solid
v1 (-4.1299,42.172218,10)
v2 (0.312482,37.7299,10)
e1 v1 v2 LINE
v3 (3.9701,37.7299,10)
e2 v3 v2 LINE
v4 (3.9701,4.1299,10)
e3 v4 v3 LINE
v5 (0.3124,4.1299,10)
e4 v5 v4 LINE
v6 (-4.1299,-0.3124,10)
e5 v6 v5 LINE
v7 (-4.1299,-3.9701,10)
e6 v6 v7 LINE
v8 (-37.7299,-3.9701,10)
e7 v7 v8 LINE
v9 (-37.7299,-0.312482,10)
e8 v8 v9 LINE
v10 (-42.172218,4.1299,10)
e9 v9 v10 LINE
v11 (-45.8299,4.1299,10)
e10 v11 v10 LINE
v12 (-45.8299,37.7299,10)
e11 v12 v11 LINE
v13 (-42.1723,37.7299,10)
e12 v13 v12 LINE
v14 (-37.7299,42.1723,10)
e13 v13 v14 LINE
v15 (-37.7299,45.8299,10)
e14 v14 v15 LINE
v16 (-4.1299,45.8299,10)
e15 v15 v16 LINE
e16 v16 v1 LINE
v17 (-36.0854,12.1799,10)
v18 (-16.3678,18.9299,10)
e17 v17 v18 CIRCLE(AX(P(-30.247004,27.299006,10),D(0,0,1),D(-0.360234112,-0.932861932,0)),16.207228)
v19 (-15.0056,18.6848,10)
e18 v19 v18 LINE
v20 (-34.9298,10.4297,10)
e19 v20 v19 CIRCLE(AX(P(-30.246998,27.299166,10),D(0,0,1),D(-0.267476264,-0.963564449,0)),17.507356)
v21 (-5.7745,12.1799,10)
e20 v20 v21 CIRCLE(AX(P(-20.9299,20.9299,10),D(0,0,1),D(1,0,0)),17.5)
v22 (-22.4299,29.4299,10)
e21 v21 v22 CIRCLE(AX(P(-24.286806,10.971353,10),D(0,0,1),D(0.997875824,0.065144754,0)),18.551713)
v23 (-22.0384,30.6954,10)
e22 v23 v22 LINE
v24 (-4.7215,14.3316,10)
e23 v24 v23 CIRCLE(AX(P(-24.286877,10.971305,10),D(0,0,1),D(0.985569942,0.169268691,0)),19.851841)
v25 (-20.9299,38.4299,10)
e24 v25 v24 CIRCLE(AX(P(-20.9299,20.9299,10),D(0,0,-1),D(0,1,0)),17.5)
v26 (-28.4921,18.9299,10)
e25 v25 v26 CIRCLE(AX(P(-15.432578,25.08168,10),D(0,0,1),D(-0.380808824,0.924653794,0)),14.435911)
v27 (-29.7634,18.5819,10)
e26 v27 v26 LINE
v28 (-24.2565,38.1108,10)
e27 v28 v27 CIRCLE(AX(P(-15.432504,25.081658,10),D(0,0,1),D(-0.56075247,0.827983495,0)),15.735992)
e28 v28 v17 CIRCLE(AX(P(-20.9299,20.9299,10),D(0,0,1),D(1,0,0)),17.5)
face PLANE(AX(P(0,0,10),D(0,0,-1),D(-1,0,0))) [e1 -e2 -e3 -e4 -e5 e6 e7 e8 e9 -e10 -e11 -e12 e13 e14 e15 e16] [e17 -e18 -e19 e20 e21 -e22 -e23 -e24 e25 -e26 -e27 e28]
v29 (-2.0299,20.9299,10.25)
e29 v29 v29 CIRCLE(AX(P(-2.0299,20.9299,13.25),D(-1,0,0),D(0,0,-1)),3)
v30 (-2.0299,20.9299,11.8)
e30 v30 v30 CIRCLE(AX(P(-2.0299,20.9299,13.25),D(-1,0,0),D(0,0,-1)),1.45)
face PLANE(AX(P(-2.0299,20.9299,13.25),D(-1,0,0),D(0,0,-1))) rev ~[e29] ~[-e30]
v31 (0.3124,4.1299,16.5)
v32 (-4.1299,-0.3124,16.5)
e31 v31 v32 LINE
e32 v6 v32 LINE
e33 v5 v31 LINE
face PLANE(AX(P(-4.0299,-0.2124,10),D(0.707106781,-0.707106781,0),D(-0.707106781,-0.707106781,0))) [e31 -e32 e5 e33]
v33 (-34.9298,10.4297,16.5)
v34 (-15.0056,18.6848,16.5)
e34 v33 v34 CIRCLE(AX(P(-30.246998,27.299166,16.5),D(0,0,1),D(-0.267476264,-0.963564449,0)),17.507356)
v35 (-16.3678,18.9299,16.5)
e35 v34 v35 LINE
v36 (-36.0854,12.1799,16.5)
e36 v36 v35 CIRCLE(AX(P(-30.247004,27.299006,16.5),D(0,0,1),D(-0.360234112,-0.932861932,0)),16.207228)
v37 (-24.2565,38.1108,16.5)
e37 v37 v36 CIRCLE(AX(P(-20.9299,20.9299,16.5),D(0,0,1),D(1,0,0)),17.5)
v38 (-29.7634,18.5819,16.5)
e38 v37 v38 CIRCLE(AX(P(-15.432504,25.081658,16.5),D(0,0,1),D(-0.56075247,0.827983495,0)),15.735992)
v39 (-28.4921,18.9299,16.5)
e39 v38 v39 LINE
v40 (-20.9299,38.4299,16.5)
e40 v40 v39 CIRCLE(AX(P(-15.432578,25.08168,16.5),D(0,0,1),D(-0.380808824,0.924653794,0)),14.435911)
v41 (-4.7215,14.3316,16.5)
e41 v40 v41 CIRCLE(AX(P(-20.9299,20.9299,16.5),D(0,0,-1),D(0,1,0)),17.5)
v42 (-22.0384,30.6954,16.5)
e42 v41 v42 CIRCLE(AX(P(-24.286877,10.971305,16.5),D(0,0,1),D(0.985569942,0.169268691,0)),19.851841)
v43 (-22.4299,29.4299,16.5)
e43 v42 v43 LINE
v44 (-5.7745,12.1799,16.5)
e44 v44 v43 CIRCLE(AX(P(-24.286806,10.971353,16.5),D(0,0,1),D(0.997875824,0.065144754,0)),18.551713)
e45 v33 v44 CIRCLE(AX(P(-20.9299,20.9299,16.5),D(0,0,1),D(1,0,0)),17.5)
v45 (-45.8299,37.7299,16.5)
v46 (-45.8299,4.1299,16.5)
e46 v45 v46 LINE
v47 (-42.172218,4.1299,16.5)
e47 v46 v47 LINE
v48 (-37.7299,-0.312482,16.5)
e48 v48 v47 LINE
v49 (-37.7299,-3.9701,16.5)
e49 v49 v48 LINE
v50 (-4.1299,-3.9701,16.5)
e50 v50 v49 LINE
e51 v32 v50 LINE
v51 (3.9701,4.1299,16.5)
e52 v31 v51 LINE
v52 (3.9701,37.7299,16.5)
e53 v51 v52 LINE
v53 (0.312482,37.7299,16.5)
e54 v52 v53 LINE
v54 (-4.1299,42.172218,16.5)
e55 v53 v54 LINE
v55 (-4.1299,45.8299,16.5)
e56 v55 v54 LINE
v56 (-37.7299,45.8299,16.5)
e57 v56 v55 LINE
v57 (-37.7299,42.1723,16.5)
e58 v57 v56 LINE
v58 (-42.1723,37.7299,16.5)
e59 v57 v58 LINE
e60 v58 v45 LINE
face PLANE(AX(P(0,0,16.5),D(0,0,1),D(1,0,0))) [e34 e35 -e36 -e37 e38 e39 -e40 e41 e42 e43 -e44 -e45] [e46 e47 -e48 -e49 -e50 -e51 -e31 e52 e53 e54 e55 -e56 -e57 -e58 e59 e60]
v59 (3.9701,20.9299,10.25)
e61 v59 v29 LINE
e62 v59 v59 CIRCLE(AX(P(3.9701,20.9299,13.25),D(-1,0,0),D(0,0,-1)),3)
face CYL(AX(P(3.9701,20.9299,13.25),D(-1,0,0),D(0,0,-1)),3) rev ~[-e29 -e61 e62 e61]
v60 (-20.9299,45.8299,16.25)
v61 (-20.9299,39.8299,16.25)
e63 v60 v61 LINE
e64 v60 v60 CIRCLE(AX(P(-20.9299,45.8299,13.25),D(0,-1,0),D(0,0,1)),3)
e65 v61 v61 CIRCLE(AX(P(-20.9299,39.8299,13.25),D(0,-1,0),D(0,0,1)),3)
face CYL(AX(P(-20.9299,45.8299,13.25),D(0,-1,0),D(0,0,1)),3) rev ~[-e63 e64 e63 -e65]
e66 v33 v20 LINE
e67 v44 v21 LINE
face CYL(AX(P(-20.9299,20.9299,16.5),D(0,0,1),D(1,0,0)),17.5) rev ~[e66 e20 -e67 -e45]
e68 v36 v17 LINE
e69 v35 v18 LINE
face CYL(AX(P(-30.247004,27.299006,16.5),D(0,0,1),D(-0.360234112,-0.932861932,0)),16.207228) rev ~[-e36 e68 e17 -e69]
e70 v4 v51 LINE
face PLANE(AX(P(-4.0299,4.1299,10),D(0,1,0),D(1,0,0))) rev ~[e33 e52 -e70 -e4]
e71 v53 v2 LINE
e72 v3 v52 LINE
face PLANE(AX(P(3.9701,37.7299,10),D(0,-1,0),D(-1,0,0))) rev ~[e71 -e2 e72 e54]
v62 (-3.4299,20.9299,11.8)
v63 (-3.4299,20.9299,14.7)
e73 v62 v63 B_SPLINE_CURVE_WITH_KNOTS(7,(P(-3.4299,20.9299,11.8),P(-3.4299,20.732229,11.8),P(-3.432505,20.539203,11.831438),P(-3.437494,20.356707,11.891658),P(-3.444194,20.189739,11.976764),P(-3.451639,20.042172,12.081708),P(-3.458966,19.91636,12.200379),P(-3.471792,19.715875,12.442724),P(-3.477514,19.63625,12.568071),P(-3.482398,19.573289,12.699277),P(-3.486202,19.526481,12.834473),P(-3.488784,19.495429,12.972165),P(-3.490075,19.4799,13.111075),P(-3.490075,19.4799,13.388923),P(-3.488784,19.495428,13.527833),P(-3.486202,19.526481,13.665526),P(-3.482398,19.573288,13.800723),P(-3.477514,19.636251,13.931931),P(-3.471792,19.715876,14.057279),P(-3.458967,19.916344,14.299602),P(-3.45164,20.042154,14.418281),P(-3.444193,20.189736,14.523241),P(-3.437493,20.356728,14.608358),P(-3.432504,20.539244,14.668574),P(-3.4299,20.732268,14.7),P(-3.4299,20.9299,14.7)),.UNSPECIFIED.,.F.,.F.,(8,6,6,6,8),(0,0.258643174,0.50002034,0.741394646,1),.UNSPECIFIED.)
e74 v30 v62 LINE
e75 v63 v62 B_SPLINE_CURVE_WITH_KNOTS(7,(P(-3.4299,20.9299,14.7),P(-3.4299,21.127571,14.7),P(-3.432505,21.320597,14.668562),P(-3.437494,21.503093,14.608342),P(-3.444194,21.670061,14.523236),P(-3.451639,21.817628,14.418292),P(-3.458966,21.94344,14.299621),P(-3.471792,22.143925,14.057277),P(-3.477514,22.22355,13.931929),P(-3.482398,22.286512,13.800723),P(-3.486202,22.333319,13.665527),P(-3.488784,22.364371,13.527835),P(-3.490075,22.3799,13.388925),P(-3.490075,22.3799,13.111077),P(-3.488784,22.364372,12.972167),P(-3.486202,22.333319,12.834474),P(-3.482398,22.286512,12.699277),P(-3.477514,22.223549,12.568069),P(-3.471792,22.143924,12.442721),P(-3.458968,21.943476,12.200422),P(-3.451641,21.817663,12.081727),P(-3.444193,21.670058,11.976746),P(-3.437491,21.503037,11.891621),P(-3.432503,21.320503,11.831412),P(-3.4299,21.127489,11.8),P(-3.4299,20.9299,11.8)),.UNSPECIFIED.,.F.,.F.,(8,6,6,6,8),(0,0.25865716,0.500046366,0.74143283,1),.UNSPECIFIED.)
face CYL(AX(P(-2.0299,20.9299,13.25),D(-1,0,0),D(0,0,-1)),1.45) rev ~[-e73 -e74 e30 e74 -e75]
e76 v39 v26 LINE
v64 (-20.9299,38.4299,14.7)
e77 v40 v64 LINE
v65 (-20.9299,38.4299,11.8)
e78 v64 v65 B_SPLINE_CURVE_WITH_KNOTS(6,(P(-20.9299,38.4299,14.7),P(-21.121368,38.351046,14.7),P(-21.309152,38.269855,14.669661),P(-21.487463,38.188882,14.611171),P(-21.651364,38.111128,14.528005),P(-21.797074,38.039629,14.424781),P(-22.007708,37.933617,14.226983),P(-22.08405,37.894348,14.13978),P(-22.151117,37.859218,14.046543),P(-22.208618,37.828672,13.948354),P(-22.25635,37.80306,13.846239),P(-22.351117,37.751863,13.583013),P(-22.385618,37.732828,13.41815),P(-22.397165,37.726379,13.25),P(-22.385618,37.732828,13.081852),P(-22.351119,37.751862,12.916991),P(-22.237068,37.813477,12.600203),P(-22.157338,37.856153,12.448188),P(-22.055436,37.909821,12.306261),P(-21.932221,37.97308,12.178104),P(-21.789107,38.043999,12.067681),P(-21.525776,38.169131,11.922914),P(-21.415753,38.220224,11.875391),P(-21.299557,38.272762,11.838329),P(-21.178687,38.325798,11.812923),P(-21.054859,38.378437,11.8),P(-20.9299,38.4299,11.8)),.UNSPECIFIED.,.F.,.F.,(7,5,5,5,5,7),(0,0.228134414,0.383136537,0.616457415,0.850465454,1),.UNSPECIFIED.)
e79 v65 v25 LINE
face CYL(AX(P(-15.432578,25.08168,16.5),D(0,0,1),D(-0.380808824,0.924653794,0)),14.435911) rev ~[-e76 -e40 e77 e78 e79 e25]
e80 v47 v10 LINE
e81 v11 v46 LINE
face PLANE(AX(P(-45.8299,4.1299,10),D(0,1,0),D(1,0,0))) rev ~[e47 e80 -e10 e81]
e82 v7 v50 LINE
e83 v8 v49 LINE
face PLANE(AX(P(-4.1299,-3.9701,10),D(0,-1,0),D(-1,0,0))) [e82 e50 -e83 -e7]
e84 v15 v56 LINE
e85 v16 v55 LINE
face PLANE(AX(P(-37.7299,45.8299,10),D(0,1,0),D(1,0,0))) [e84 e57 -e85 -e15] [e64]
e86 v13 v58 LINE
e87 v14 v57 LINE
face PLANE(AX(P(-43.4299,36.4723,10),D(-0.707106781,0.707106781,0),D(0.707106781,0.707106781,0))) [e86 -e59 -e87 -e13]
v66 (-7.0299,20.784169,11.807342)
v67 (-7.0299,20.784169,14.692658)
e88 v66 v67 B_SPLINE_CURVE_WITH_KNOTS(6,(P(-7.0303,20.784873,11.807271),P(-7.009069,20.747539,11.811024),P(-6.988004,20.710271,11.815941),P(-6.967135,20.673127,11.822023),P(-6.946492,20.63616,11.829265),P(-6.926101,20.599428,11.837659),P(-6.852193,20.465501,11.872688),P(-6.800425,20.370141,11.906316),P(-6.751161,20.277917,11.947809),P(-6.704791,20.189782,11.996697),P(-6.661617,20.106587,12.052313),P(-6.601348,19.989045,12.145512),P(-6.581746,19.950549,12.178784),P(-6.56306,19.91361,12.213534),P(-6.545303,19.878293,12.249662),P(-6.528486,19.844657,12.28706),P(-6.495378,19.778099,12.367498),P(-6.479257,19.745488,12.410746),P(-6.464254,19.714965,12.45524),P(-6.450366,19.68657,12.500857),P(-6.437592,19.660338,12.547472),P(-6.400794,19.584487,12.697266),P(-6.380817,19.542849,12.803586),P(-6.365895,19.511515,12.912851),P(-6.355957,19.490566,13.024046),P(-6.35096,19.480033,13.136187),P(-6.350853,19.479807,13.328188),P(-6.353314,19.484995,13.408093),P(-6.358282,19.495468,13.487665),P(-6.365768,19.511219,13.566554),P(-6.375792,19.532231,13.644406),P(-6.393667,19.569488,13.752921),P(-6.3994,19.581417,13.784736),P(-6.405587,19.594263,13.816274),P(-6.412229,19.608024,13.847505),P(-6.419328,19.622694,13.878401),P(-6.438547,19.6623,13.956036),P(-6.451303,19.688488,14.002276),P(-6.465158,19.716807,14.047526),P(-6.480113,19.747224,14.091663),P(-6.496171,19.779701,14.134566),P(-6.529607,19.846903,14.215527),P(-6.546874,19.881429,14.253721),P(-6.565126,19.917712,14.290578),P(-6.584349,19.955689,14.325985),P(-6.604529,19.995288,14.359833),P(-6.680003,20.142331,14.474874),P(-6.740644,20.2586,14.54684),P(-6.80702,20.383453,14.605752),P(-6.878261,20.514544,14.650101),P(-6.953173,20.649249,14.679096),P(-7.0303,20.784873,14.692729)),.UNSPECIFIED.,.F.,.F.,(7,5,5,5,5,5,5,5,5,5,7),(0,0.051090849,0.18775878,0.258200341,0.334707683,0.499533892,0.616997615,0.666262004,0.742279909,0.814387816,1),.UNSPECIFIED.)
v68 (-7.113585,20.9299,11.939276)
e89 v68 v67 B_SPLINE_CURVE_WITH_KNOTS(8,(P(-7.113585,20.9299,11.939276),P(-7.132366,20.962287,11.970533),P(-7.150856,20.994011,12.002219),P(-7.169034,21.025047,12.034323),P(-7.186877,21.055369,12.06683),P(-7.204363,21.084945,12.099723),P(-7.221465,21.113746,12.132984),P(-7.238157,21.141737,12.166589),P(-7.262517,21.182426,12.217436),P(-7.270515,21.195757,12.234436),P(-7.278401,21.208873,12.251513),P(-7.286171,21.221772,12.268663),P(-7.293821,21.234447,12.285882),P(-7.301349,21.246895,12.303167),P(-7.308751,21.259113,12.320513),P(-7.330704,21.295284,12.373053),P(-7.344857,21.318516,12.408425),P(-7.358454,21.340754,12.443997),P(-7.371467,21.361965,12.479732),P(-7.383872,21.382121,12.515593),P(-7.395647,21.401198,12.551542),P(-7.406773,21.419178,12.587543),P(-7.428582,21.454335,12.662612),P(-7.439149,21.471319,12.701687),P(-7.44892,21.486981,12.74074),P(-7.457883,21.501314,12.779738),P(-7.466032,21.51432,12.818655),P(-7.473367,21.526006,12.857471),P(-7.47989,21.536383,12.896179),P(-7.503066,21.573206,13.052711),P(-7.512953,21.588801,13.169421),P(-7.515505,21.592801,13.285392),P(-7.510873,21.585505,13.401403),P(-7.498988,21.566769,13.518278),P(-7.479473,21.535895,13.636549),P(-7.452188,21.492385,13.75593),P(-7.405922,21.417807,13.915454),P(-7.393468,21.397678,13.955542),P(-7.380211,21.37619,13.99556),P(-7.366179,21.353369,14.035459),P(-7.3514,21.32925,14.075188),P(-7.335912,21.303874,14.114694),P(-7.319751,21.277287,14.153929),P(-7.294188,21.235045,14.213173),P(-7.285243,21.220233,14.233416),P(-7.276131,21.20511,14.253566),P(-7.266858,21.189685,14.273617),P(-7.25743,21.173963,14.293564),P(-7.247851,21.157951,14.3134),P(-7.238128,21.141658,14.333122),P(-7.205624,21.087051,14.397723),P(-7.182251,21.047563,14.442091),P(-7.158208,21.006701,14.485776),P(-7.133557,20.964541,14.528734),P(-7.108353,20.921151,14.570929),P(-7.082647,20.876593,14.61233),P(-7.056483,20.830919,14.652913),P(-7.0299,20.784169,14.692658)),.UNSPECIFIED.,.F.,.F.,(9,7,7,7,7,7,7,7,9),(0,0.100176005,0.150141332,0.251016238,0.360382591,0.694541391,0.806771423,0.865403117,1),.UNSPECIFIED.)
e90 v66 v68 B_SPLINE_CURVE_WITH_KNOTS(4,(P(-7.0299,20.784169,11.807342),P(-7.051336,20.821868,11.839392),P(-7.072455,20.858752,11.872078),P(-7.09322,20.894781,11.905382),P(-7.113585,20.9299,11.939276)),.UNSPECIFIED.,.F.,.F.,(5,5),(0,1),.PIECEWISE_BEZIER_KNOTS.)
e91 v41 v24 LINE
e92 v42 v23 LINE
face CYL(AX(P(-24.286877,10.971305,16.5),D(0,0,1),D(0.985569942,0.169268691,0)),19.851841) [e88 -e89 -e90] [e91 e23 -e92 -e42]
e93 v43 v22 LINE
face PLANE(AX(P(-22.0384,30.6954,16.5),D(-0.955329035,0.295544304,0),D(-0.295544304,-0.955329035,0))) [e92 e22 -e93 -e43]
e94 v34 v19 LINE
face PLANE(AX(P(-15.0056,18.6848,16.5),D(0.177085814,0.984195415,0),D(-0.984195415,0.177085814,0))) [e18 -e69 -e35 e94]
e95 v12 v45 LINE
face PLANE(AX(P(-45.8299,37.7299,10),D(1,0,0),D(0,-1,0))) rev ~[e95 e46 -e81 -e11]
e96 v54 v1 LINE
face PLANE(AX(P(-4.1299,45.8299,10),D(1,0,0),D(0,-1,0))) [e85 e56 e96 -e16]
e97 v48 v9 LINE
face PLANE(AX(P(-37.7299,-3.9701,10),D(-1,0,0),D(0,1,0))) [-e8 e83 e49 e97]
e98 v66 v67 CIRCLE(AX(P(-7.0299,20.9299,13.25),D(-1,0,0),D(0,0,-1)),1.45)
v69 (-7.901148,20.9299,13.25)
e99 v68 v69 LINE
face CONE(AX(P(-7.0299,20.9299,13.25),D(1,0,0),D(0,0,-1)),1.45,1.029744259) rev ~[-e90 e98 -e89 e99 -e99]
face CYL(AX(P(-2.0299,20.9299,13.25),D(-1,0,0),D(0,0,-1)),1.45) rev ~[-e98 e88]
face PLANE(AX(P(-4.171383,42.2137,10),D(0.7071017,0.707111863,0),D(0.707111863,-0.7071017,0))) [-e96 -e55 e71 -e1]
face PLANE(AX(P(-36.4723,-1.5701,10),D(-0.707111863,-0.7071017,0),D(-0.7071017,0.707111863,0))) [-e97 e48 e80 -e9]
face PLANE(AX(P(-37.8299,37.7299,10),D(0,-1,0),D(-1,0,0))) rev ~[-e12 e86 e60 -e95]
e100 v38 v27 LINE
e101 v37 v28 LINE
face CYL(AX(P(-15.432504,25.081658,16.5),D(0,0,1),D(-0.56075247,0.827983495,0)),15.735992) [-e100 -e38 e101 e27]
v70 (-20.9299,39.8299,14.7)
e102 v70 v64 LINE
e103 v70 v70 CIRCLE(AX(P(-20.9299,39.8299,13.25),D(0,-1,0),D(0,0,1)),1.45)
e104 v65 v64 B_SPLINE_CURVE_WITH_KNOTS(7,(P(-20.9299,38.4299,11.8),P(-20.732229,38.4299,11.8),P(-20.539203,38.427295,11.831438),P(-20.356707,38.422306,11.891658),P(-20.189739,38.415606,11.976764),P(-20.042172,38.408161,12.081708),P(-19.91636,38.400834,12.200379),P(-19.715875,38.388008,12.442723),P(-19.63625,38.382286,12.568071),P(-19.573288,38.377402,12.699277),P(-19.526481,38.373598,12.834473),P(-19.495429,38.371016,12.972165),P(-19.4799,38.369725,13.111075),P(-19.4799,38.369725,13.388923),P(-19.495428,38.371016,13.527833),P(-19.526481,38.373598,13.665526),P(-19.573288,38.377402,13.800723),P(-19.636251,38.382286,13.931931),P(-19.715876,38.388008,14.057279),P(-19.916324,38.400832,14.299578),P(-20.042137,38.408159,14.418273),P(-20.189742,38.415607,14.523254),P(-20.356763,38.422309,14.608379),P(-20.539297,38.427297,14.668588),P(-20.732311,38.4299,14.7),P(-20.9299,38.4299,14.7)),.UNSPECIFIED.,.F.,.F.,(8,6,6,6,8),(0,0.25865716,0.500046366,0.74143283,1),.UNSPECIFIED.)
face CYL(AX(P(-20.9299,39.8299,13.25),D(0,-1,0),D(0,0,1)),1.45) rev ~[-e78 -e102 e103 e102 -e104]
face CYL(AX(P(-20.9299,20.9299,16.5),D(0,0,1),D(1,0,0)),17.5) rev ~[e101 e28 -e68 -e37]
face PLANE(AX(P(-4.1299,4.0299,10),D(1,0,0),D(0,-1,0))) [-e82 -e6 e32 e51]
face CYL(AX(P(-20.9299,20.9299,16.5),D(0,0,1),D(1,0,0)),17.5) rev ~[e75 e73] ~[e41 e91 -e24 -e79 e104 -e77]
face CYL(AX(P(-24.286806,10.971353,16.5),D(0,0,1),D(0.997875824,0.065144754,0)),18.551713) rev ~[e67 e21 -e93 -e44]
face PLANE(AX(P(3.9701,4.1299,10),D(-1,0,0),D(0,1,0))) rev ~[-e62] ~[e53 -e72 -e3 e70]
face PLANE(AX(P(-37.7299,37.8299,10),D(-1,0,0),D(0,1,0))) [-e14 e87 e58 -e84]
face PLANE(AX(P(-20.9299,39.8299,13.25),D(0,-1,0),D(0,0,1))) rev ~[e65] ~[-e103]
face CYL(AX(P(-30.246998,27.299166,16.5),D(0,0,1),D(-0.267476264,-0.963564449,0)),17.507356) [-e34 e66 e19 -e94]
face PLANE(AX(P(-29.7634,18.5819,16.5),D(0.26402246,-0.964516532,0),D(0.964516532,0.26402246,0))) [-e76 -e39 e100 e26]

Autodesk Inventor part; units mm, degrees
ref_plane "YZ Plane" through (0, 0, 0) normal (1, 0, 0) x (0, 1, 0)
ref_plane "Work Plane1" through (0, 0, 10) normal (0, 0, 1) x (1, 0, 0)
sketch "Sketch1" plane through (0, 0, 10) normal (0, 0, 1) x (1, 0, 0)
  line L0 (-4.0299, -0.3538) -> (-2.2322, 1.4439) construction
  arc A0 (-1.4439, 2.2322) -> (-2.2322, 1.4439) centre (-0.9299, 0.9299) ccw construction
  line L1 (-1.4439, 2.2322) -> (0.3538, 4.0299) construction
  line L2 (-37.8299, 42.2137) -> (-37.8299, 45.8299) construction
  line L3 (-37.8299, 45.8299) -> (-4.0299, 45.8299) construction
  line L4 (-4.0299, 45.8299) -> (-4.0299, 42.2137) construction
  line L5 (-4.0299, 4.0299) -> (0.3538, 4.0299) projected
  line L6 (-20.9299, 58.9723) -> (17.1124, 20.9299) construction
  line L7 (17.1124, 20.9299) -> (-20.9299, -17.1124) construction
  line L8 (-20.9299, -17.1124) -> (-58.9723, 20.9299) construction
  line L9 (-58.9723, 20.9299) -> (-20.9299, 58.9723) construction
  line L10 (-20.9299, 58.9723) -> (-20.9299, -17.1124) construction
  line L11 (17.1124, 20.9299) -> (-58.9723, 20.9299) construction
  line L12 (-20.9299, 58.9723) -> (32.8701, 58.9723) construction
  line L13 (-43.4299, 43.4299) -> (1.5701, 43.4299) construction
  line L14 (1.5701, 43.4299) -> (1.5701, -1.5701) construction
  line L15 (1.5701, -1.5701) -> (-43.4299, -1.5701) construction
  line L16 (-43.4299, -1.5701) -> (-43.4299, 43.4299) construction
  line L17 (-43.4299, 43.4299) -> (1.5701, -1.5701) construction
  line L18 (1.5701, 43.4299) -> (-43.4299, -1.5701) construction
  line L19 (-43.4299, 5.3876) -> (-43.4299, 36.4723)
  line L20 (-43.4299, 36.4723) -> (-36.4723, 43.4299)
  line L21 (-36.4723, 43.4299) -> (-5.3876, 43.4299)
  line L22 (-5.3876, 43.4299) -> (1.5701, 36.4723)
  line L23 (1.5701, 36.4723) -> (1.5701, 5.3876)
  line L24 (1.5701, 5.3876) -> (-5.3876, -1.5701)
  line L25 (-5.3876, -1.5701) -> (-36.4723, -1.5701)
  line L26 (-36.4723, -1.5701) -> (-43.4299, 5.3876)
  line L27 (-4.0299, 42.2137) -> (-37.8299, 42.2137) projected
  line L28 (-4.0299, -0.3538) -> (-4.0299, 4.0299) projected
  circle A1 centre (-20.9299, 20.9299) radius 13.3985
  circle A2 centre (-20.9299, 20.9299) radius 15.4895
  point P0 (-37.8299, 4.0299)
  dimension "d18" = 53.8
  dimension "d19" = 45
  dimension "d20" = 53.8
  dimension "d21" = 45
  dimension "d22" = 45
  dimension "d30" = 26.797
  dimension "d36" = 30.979
extrude "Extrusion1" add sketch "Sketch1" along normal blind 6.5 contours L28 L24 L25 L26 L19 L20 L27 L22 L23 L5 | L5 L24 L28 | L27 L20 L21 L22 | A1 | A2
ref_plane "Work Plane2" through (-40.9959, 0.8639, 22.2359) normal (0, 0, 1) x (1, 0, 0)
sketch "Sketch3" plane through (0, 0, 10) normal (0, 0, -1) x (-1, 0, 0)
  line L0 (37.8299, -0.4701) -> (37.8299, 4.0299) construction
  line L1 (4.0299, 4.0299) -> (4.0299, -0.4701) construction
  line L2 (37.8299, -0.4701) -> (37.8299, 1.1886) construction
  line L3 (4.0299, -3.9701) -> (4.0299, -0.3538) construction
  line L4 (45.8299, 4.0299) -> (42.2137, 4.0299) construction
  line L5 (-0.3538, 4.0299) -> (-3.9701, 4.0299) construction
  line L6 (-3.9701, 37.8299) -> (-0.3538, 37.8299) construction
  line L7 (4.0299, 42.2137) -> (4.0299, 45.8299) construction
  line L8 (37.8299, 45.8299) -> (37.8299, 42.2137) construction
  line L9 (42.2137, 37.8299) -> (45.8299, 37.8299) construction
  line L10 (37.8299, 37.7299) -> (45.8299, 37.7299)
  line L11 (45.8299, 37.7299) -> (45.8299, 4.1299)
  line L12 (45.8299, 4.1299) -> (37.8299, 4.1299)
  line L13 (37.8299, 4.1299) -> (37.8299, 37.7299)
  line L14 (37.7299, 4.0299) -> (4.1299, 4.0299)
  line L15 (4.1299, 4.0299) -> (4.1299, -3.9701)
  line L16 (4.1299, -3.9701) -> (37.7299, -3.9701)
  line L17 (37.7299, -3.9701) -> (37.7299, 4.0299)
  line L18 (4.0299, 4.1299) -> (-3.9701, 4.1299)
  line L19 (-3.9701, 4.1299) -> (-3.9701, 37.7299)
  line L20 (-3.9701, 37.7299) -> (4.0299, 37.7299)
  line L21 (4.0299, 37.7299) -> (4.0299, 4.1299)
  line L22 (4.1299, 37.8299) -> (37.7299, 37.8299)
  line L23 (37.7299, 37.8299) -> (37.7299, 45.8299)
  line L24 (37.7299, 45.8299) -> (4.1299, 45.8299)
  line L25 (4.1299, 45.8299) -> (4.1299, 37.8299)
  point P0 (0, 0)
  dimension "d23" = 0.1
  dimension "d24" = 0.1
  dimension "d25" = 0.1
  dimension "d26" = 0.1
  dimension "d27" = 0.1
extrude "Extrusion3" add sketch "Sketch3" against normal up to surface (6.5 mm away)
sketch "Sketch6" plane through (0, 0, 16.5) normal (0, 0, 1) x (1, 0, 0)
  circle A0 centre (-20.9299, 20.9299) radius 17.5
  circle A1 centre (-20.9299, 20.9299) radius 13.3985
  line L0 (-45.8299, 4.1299) -> (-45.8299, 37.7299) projected
  line L1 (-4.1299, -3.9701) -> (-37.7299, -3.9701) projected
  line L2 (-37.7299, 45.8299) -> (-4.1299, 45.8299) projected
  point P0 (0, 0)
  point P1 (-45.8299, 20.9299)
  point P2 (-20.9299, -3.9701)
  point P3 (-20.9299, 45.8299)
  dimension "d37" = 26.797
  dimension "d38" = 35
extrude "Extrusion5" cut sketch "Sketch6" against normal blind 12 contours A0 | A1
sketch "Sketch7" plane through (0, 0, 16.5) normal (0, 0, 1) x (1, 0, 0)
  circle A0 centre (-20.9299, 20.9299) radius 17.5 construction
  line L0 (3.9701, 4.1299) -> (0.3124, 4.1299) construction
  line L1 (3.9701, 37.7299) -> (3.9701, 4.1299) construction
  line L2 (0.3124, 37.7299) -> (3.9701, 37.7299) construction
  line L3 (0.3124, 37.7299) -> (-4.1299, 42.1723) construction
  line L4 (-4.1299, 45.8299) -> (-4.1299, 42.1723) construction
  line L5 (-37.7299, 45.8299) -> (-4.1299, 45.8299) construction
  line L6 (-37.7299, 42.1723) -> (-37.7299, 45.8299) construction
  line L7 (-37.7299, 42.1723) -> (-42.1723, 37.7299) construction
  line L8 (-45.8299, 37.7299) -> (-42.1723, 37.7299) construction
  line L9 (-45.8299, 4.1299) -> (-45.8299, 37.7299) construction
  line L10 (-42.1723, 4.1299) -> (-45.8299, 4.1299) construction
  line L11 (-42.1723, 4.1299) -> (-37.7299, -0.3124) construction
  line L12 (-37.7299, -3.9701) -> (-37.7299, -0.3124) construction
  line L13 (-4.1299, -3.9701) -> (-37.7299, -3.9701) construction
  line L14 (-4.1299, -0.3124) -> (-4.1299, -3.9701) construction
  line L15 (-4.1299, -0.3124) -> (0.3124, 4.1299) construction
  circle A1 centre (-20.9299, 20.9299) radius 17.5 construction
  line L16 (-5.7745, 12.1799) -> (-36.0854, 12.1799) construction
  line L17 (-36.0854, 12.1799) -> (-20.9299, 38.4299) construction
  line L18 (-20.9299, 38.4299) -> (-5.7745, 12.1799) construction
  circle A2 centre (-22.4299, 22.4299) radius 7 construction
  arc A3 (-20.9299, 38.4299) -> (-24.2565, 38.1108) centre (-20.9299, 20.9299) ccw
  line L19 (-28.4921, 18.9299) -> (-22.4299, 29.4299)
  line L20 (-22.4299, 29.4299) -> (-16.3678, 18.9299)
  line L21 (-16.3678, 18.9299) -> (-28.4921, 18.9299)
  arc A4 (-20.9299, 38.4299) -> (-28.4921, 18.9299) centre (-15.4327, 25.0818) ccw
  arc A5 (-24.2565, 38.1108) -> (-29.7634, 18.5819) centre (-15.4327, 25.0818) ccw
  line L22 (-29.7634, 18.5819) -> (-28.4921, 18.9299)
  arc A6 (-5.7745, 12.1799) -> (-22.4299, 29.4299) centre (-24.2867, 10.9714) ccw
  arc A7 (-5.7745, 12.1799) -> (-4.7215, 14.3316) centre (-20.9299, 20.9299) ccw
  arc A8 (-4.7215, 14.3316) -> (-22.0384, 30.6954) centre (-24.2867, 10.9714) ccw
  line L23 (-22.0384, 30.6954) -> (-22.4299, 29.4299)
  arc A9 (-36.0854, 12.1799) -> (-16.3678, 18.9299) centre (-30.247, 27.2992) ccw
  arc A10 (-36.0854, 12.1799) -> (-34.9298, 10.4297) centre (-20.9299, 20.9299) ccw
  arc A11 (-34.9298, 10.4297) -> (-15.0056, 18.6848) centre (-30.247, 27.2992) ccw
  line L24 (-15.0056, 18.6848) -> (-16.3678, 18.9299)
  dimension "d93" = 14
  dimension "d94" = 1.5
  dimension "d95" = 1.5
  dimension "d96" = 1.3
  dimension "d97" = 1.3
  dimension "d98" = 1.3
extrude "Extrusion6" add sketch "Sketch7" against normal up to surface (6.5 mm away) contours A4 L22 A5 A3 | L23 A8 A7 A6 | L24 A11 A10 A9
sketch "Sketch8" plane through (-37.7299, 45.8299, 10) normal (0, 1, 0) x (1, 0, 0)
  line L0 (0, 0) -> (33.6, 0) projected
  line L1 (0, -6.5) -> (33.6, -6.5) projected
  line L2 (33.6, 0) -> (33.6, -6.5) projected
  line L3 (0, 0) -> (0, -6.5) projected
  point P0 (37.7299, 10)
  point P1 (16.8, -3.25)
  point P2 (16.8, 0)
  point P3 (16.8, -6.5)
  point P4 (33.6, -3.25)
  point P5 (0, -3.25)
hole "Hole1" at (-20.9299, 45.8299, 13.25) direction (0, -1, 0) diameter 2.9 depth 11 tip angle 118 counterbore diameter 6 counterbore depth 6
sketch "Sketch9" plane through (3.9701, 4.1299, 10) normal (1, 0, 0) x (0, 0, -1)
  line L0 (0, 0) -> (0, 33.6) projected
  line L1 (-6.5, 33.6) -> (-6.5, 0) projected
  line L2 (0, 33.6) -> (-6.5, 33.6) projected
  line L3 (0, 0) -> (-6.5, 0) projected
  point P0 (10, -4.1299)
  point P1 (-3.25, 16.8)
  point P2 (0, 16.8)
  point P3 (-6.5, 16.8)
  point P4 (-3.25, 33.6)
  point P5 (-3.25, 0)
hole "Hole2" at (3.9701, 20.9299, 13.25) direction (-1, 0, 0) diameter 2.9 depth 11 tip angle 118 counterbore diameter 6 counterbore depth 6
properties part number "50_Cube_Insert_Thorlabs"
